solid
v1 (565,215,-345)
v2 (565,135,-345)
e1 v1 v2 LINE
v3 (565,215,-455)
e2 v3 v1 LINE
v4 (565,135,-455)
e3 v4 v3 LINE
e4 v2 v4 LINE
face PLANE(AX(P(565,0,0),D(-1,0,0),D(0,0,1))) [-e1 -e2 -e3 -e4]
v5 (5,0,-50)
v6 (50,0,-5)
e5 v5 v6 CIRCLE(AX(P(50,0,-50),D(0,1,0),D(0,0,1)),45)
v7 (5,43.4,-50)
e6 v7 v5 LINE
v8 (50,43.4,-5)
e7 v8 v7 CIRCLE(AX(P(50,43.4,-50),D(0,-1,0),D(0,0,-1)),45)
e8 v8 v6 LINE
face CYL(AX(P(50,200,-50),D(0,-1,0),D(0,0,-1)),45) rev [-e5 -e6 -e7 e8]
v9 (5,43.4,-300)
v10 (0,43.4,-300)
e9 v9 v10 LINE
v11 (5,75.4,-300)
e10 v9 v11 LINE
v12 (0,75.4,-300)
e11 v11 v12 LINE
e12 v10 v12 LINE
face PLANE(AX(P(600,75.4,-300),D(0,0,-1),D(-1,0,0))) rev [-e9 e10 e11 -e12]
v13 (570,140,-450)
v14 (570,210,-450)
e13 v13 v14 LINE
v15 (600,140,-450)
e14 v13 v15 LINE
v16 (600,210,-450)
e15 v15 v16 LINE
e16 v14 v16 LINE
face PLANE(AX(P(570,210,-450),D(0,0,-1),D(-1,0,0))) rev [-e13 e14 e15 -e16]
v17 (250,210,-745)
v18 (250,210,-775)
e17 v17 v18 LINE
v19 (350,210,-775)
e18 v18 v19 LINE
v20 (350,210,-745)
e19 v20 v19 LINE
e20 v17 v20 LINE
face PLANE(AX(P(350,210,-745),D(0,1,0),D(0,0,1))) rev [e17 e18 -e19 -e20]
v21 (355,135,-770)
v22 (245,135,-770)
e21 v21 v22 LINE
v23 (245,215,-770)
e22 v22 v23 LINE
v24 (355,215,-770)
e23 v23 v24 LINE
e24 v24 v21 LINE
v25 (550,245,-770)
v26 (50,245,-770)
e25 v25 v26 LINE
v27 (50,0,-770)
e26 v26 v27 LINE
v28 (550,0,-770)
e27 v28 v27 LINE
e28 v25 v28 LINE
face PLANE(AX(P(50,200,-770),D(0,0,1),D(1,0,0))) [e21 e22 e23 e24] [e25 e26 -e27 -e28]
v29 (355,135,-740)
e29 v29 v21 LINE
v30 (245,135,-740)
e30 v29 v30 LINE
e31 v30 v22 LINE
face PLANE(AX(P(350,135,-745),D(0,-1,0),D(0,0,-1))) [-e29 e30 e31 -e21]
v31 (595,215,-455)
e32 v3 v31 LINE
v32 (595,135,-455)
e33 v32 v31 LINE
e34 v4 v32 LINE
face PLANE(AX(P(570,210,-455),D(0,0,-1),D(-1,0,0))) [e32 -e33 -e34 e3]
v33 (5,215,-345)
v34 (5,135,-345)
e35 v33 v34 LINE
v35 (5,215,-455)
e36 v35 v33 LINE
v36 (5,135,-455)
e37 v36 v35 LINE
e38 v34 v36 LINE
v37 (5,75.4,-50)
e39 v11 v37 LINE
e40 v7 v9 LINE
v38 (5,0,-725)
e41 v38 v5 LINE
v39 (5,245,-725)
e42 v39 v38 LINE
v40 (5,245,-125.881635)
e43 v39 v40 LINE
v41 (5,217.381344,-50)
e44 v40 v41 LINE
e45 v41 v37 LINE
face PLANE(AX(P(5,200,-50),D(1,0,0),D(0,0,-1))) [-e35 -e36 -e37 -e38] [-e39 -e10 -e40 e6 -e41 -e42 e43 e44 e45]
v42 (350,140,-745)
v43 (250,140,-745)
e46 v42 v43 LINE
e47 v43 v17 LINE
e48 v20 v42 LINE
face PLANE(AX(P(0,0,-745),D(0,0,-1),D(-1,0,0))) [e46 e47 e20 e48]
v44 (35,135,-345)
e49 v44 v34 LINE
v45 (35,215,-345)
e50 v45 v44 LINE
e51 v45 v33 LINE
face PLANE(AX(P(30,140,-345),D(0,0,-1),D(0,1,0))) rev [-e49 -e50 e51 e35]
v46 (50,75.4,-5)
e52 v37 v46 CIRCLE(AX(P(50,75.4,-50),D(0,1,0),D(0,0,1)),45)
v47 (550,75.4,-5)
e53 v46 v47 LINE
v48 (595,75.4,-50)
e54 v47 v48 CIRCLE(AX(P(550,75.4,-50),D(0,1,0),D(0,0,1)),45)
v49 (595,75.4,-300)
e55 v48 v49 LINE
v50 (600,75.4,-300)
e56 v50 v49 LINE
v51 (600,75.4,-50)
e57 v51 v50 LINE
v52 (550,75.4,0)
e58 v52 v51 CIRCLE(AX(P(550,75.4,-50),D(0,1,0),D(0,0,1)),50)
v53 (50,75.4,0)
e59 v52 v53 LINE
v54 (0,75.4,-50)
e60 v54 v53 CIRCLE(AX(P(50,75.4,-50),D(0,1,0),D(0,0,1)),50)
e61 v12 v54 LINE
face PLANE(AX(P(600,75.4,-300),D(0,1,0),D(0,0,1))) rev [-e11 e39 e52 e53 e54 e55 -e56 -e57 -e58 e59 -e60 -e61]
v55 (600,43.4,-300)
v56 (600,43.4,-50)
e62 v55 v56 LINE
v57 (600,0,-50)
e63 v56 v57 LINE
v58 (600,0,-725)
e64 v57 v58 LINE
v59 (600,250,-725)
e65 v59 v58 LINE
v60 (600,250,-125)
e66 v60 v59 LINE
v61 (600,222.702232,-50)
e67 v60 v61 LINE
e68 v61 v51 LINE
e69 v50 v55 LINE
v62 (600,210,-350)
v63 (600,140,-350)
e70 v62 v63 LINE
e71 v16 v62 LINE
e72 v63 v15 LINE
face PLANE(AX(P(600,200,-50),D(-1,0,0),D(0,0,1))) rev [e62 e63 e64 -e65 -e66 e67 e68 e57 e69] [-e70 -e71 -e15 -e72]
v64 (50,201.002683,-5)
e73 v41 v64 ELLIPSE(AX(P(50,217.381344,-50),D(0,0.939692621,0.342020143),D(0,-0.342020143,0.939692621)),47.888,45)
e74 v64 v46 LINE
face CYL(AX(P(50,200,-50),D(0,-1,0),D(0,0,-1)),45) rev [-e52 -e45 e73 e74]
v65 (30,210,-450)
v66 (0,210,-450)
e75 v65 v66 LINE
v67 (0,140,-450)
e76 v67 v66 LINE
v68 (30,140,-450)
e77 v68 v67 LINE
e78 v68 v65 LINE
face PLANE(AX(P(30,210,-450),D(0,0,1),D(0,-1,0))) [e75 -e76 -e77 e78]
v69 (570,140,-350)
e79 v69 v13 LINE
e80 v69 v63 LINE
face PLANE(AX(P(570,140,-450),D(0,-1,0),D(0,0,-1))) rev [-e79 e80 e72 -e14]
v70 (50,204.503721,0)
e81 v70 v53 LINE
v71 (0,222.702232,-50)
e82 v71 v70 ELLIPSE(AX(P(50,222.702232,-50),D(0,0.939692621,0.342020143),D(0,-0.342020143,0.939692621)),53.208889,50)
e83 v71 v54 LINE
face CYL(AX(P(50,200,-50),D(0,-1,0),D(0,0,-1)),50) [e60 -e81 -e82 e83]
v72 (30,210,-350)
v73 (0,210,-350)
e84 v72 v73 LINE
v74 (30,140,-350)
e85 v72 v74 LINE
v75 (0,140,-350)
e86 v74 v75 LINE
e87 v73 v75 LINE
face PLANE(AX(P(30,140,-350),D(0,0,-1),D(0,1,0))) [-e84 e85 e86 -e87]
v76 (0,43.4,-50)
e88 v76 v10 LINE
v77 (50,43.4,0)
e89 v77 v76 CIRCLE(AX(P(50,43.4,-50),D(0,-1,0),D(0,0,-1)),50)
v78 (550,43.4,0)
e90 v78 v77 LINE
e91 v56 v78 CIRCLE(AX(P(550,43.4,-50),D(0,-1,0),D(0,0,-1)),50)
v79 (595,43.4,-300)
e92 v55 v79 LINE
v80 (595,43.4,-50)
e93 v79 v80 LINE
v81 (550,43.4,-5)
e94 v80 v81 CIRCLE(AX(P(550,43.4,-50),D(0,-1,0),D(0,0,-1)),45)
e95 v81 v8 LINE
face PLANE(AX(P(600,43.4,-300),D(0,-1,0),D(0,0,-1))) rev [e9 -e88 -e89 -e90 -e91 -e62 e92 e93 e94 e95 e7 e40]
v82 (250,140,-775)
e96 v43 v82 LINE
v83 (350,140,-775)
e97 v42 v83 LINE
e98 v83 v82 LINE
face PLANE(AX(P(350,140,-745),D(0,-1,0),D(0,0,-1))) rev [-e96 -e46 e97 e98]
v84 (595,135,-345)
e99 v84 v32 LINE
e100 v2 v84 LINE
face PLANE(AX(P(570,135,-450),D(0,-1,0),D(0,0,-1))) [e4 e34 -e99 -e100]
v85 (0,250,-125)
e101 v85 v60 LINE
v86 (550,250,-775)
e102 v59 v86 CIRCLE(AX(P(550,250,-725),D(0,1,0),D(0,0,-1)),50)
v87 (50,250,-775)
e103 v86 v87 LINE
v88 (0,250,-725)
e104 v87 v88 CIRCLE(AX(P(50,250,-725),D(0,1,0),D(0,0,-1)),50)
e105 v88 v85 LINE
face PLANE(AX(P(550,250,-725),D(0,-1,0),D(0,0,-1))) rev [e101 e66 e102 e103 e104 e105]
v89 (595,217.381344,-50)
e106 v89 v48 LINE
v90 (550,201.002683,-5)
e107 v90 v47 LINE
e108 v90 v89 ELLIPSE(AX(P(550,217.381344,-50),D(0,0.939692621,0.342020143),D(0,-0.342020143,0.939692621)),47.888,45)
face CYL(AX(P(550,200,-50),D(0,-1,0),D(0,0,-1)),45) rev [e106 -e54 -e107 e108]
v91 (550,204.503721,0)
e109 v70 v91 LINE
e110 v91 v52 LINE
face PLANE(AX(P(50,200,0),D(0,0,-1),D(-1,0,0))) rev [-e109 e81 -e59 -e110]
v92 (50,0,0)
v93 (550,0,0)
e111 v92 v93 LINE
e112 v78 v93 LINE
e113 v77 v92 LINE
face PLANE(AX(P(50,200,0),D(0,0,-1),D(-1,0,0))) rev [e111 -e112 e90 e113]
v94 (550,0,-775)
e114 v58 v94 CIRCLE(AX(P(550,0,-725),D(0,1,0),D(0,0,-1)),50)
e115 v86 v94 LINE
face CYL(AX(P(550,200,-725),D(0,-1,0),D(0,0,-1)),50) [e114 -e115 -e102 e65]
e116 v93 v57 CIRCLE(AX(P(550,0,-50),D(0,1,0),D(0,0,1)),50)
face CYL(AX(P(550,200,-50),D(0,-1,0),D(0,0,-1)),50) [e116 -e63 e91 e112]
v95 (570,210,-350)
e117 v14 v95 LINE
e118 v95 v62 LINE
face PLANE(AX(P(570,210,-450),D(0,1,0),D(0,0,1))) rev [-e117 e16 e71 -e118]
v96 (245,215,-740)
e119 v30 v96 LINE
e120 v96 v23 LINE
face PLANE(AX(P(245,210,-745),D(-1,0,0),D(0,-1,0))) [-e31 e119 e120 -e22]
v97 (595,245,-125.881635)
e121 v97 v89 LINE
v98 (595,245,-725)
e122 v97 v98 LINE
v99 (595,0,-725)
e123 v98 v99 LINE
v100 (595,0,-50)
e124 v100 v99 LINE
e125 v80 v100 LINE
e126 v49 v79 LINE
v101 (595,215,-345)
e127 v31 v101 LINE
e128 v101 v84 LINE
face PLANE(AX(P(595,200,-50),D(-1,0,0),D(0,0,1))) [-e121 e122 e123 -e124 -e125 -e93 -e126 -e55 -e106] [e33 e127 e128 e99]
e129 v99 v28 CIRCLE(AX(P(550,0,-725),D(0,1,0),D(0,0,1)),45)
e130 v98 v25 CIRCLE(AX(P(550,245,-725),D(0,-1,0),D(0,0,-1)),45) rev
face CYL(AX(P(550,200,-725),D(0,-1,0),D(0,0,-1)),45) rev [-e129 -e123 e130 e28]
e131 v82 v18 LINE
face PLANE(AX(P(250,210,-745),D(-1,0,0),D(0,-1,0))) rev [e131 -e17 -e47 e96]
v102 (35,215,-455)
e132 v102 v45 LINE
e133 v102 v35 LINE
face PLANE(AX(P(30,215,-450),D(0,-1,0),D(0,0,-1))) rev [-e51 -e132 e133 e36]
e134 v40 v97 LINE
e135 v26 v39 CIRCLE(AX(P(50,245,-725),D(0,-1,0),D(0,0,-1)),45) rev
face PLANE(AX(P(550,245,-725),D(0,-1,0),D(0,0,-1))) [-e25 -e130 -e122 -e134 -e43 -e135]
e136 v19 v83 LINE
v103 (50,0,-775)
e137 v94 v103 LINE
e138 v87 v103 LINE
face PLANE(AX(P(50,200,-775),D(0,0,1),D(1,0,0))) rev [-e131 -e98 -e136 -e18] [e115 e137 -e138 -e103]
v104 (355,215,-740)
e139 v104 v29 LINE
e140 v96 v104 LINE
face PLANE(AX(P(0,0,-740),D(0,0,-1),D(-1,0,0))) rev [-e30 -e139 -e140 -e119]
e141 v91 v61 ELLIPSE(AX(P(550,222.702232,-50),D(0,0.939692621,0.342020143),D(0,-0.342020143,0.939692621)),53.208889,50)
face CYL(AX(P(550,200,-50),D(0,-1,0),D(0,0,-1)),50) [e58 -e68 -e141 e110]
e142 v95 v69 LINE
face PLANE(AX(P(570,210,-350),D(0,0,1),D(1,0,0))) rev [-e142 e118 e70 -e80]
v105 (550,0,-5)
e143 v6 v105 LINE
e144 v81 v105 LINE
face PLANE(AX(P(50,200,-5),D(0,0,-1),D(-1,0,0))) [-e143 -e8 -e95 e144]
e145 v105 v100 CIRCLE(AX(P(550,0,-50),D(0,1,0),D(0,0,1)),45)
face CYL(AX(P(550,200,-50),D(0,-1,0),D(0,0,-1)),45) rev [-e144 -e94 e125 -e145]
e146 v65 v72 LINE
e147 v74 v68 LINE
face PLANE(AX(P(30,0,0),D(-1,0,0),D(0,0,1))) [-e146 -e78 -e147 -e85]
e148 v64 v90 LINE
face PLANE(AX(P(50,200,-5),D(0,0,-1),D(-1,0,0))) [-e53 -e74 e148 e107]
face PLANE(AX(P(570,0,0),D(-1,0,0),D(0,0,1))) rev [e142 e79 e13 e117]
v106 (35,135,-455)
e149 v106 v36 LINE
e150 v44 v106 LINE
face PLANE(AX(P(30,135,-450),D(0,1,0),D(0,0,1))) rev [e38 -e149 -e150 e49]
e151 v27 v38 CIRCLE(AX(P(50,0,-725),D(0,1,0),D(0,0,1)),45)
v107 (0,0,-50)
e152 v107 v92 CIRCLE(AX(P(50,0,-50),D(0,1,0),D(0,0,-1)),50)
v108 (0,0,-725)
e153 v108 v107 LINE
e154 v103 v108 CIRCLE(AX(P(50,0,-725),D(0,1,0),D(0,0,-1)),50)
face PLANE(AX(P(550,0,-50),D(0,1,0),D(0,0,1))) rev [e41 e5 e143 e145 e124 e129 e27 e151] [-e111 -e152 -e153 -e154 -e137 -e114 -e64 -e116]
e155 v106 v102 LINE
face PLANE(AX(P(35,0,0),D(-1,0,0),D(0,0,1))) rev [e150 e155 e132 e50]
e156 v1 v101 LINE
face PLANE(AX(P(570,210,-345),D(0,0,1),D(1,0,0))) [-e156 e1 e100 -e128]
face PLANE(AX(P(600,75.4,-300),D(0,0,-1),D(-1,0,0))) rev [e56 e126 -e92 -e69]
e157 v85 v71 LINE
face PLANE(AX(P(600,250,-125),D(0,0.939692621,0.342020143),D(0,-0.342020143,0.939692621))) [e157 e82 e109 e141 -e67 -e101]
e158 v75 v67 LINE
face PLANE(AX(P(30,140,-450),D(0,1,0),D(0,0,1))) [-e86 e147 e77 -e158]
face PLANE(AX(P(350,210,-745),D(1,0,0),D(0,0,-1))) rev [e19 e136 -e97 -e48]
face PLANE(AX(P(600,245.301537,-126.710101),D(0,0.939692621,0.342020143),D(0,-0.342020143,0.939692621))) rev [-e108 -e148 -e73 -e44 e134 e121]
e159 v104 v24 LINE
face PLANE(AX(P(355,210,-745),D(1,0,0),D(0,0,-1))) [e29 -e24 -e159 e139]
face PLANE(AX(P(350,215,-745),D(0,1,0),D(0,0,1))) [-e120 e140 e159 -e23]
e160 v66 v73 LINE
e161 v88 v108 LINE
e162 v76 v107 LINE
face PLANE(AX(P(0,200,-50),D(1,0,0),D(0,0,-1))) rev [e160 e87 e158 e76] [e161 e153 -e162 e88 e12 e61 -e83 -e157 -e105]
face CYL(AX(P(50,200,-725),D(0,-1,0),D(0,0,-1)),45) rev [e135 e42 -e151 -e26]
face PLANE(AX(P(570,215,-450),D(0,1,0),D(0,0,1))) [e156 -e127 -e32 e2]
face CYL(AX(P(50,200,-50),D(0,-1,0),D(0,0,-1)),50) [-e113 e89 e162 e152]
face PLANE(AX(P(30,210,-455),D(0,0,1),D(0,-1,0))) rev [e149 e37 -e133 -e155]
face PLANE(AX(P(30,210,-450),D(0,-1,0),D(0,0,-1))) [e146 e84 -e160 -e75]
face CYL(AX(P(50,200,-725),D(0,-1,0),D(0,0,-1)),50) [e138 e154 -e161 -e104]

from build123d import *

# Parameters (mm, degrees)
BOSS_EXTRUDE1_DEPTH     = 200
BOSS_EXTRUDE2_DEPTH     = 50
DRAFT2_START            = 200
DRAFT2_DEPTH            = 50
DRAFT2_START_2          = 192.170637281
DRAFT2_2_OUTLINE_W      = 602
DRAFT2_2_OUTLINE_H      = 136
DRAFT2_2_DEPTH          = 43.829362719
SKETCH12_W              = 100
SKETCH12_H              = 70
CUT_EXTRUDE4_DEPTH      = 30
SKETCH14_W              = 100
SKETCH14_H              = 70
CUT_EXTRUDE5_DEPTH      = 30
SKETCH13_W              = 100
SKETCH13_H              = 70
CUT_EXTRUDE2_DEPTH      = 30
SHELL1_T                = -5
CUT_EXTRUDE6_DEPTH      = 1012.496416207
CUT_EXTRUDE6_DEPTH_BACK = 1012.496416207
SKETCH15_W              = 300
SKETCH15_H              = 32


with BuildPart() as part:
    # Sketch1 → Boss-Extrude1 (new body)
    with BuildSketch(Plane(origin=(0, 0, 0), x_dir=(1, 0, 0), z_dir=(0, 1, 0))):
        with BuildLine():
            Line((50, 0), (550, 0))
            ThreePointArc((550, 0), (585.355339059, 14.644660941), (600, 50))
            Line((600, 50), (600, 725))
            ThreePointArc((600, 725), (585.355339059, 760.355339059), (550, 775))
            Line((550, 775), (50, 775))
            ThreePointArc((50, 775), (14.644660941, 760.355339059), (0, 725))
            Line((0, 725), (0, 50))
            ThreePointArc((0, 50), (14.644660941, 14.644660941), (50, 0))
        make_face()
    extrude(amount=BOSS_EXTRUDE1_DEPTH)

    # Sketch5 → Boss-Extrude2 (add)
    with BuildSketch(Plane(origin=(0, 200, 0), x_dir=(1, 0, 0), z_dir=(0, 1, 0))):
        with BuildLine():
            Line((600, 125), (0, 125))
            Line((0, 125), (0, 725))
            ThreePointArc((0, 725), (14.644660941, 760.355339059), (50, 775))
            Line((50, 775), (550, 775))
            ThreePointArc((550, 775), (585.355339059, 760.355339059), (600, 725))
            Line((600, 725), (600, 125))
        make_face()
    extrude(amount=BOSS_EXTRUDE2_DEPTH)

    # Draft2: read off the stored shape, not the designer's step
    # Draft2 outline → Draft2 (add)
    with BuildSketch(Plane(origin=(0, 0, 0), x_dir=(1, 0, 0), z_dir=(0, 1, 0)).offset(DRAFT2_START)):
        with BuildLine():
            ThreePointArc((550, 0), (585.355339059, 14.644660941), (600, 50))
            Line((600, 50), (600, 125))
            Line((600, 125), (0, 125))
            Line((0, 125), (0, 50))
            ThreePointArc((0, 50), (14.644660941, 14.644660941), (50, 0))
            Line((50, 0), (550, 0))
        make_face()
    extrude(amount=DRAFT2_DEPTH)

    # Draft2 2 outline → Draft2 2 (cut)
    with BuildSketch(Plane(origin=(0, 0, 0), x_dir=(1, 0, 0), z_dir=(0, 0.9396926207859094, 0.34202014332566616)).offset(DRAFT2_START_2)):
        with Locations((300, 136)):
            Rectangle(DRAFT2_2_OUTLINE_W, DRAFT2_2_OUTLINE_H)
    extrude(amount=DRAFT2_2_DEPTH, mode=Mode.SUBTRACT)

    # Sketch12 → Cut-Extrude4 (cut)
    with BuildSketch(Plane(origin=(0, 0, 0), x_dir=(0, 0, -1), z_dir=(1, 0, 0))):
        with Locations((400, 175)):
            Rectangle(SKETCH12_W, SKETCH12_H)
    extrude(amount=CUT_EXTRUDE4_DEPTH, mode=Mode.SUBTRACT)

    # Sketch14 → Cut-Extrude5 (cut)
    with BuildSketch(Plane(origin=(600, 0, 0), x_dir=(0, 0, -1), z_dir=(1, 0, 0))):
        with Locations((400, 175)):
            Rectangle(SKETCH14_W, SKETCH14_H)
    extrude(amount=-CUT_EXTRUDE5_DEPTH, mode=Mode.SUBTRACT)

    # Sketch13 → Cut-Extrude2 (cut)
    with BuildSketch(Plane(origin=(0, 0, -775), x_dir=(-1, 0, 0), z_dir=(0, 0, -1))):
        with Locations((-300, 175)):
            Rectangle(SKETCH13_W, SKETCH13_H)
    extrude(amount=-CUT_EXTRUDE2_DEPTH, mode=Mode.SUBTRACT)

    # Shell1
    shell1_openings = [part.faces().sort_by_distance(p)[0] for p in [
        (300, 0, -387.5),
    ]]
    offset(amount=SHELL1_T, openings=shell1_openings, kind=Kind.INTERSECTION)

    # Sketch15 → Cut-Extrude6 (cut, two sides: drawn at the far end of the back side and taken through both)
    with BuildSketch(Plane.ZY.offset(-CUT_EXTRUDE6_DEPTH_BACK)):
        with Locations((-150, 59.4)):
            Rectangle(SKETCH15_W, SKETCH15_H)
    extrude(amount=CUT_EXTRUDE6_DEPTH + CUT_EXTRUDE6_DEPTH_BACK, mode=Mode.SUBTRACT)


solid = part.part
